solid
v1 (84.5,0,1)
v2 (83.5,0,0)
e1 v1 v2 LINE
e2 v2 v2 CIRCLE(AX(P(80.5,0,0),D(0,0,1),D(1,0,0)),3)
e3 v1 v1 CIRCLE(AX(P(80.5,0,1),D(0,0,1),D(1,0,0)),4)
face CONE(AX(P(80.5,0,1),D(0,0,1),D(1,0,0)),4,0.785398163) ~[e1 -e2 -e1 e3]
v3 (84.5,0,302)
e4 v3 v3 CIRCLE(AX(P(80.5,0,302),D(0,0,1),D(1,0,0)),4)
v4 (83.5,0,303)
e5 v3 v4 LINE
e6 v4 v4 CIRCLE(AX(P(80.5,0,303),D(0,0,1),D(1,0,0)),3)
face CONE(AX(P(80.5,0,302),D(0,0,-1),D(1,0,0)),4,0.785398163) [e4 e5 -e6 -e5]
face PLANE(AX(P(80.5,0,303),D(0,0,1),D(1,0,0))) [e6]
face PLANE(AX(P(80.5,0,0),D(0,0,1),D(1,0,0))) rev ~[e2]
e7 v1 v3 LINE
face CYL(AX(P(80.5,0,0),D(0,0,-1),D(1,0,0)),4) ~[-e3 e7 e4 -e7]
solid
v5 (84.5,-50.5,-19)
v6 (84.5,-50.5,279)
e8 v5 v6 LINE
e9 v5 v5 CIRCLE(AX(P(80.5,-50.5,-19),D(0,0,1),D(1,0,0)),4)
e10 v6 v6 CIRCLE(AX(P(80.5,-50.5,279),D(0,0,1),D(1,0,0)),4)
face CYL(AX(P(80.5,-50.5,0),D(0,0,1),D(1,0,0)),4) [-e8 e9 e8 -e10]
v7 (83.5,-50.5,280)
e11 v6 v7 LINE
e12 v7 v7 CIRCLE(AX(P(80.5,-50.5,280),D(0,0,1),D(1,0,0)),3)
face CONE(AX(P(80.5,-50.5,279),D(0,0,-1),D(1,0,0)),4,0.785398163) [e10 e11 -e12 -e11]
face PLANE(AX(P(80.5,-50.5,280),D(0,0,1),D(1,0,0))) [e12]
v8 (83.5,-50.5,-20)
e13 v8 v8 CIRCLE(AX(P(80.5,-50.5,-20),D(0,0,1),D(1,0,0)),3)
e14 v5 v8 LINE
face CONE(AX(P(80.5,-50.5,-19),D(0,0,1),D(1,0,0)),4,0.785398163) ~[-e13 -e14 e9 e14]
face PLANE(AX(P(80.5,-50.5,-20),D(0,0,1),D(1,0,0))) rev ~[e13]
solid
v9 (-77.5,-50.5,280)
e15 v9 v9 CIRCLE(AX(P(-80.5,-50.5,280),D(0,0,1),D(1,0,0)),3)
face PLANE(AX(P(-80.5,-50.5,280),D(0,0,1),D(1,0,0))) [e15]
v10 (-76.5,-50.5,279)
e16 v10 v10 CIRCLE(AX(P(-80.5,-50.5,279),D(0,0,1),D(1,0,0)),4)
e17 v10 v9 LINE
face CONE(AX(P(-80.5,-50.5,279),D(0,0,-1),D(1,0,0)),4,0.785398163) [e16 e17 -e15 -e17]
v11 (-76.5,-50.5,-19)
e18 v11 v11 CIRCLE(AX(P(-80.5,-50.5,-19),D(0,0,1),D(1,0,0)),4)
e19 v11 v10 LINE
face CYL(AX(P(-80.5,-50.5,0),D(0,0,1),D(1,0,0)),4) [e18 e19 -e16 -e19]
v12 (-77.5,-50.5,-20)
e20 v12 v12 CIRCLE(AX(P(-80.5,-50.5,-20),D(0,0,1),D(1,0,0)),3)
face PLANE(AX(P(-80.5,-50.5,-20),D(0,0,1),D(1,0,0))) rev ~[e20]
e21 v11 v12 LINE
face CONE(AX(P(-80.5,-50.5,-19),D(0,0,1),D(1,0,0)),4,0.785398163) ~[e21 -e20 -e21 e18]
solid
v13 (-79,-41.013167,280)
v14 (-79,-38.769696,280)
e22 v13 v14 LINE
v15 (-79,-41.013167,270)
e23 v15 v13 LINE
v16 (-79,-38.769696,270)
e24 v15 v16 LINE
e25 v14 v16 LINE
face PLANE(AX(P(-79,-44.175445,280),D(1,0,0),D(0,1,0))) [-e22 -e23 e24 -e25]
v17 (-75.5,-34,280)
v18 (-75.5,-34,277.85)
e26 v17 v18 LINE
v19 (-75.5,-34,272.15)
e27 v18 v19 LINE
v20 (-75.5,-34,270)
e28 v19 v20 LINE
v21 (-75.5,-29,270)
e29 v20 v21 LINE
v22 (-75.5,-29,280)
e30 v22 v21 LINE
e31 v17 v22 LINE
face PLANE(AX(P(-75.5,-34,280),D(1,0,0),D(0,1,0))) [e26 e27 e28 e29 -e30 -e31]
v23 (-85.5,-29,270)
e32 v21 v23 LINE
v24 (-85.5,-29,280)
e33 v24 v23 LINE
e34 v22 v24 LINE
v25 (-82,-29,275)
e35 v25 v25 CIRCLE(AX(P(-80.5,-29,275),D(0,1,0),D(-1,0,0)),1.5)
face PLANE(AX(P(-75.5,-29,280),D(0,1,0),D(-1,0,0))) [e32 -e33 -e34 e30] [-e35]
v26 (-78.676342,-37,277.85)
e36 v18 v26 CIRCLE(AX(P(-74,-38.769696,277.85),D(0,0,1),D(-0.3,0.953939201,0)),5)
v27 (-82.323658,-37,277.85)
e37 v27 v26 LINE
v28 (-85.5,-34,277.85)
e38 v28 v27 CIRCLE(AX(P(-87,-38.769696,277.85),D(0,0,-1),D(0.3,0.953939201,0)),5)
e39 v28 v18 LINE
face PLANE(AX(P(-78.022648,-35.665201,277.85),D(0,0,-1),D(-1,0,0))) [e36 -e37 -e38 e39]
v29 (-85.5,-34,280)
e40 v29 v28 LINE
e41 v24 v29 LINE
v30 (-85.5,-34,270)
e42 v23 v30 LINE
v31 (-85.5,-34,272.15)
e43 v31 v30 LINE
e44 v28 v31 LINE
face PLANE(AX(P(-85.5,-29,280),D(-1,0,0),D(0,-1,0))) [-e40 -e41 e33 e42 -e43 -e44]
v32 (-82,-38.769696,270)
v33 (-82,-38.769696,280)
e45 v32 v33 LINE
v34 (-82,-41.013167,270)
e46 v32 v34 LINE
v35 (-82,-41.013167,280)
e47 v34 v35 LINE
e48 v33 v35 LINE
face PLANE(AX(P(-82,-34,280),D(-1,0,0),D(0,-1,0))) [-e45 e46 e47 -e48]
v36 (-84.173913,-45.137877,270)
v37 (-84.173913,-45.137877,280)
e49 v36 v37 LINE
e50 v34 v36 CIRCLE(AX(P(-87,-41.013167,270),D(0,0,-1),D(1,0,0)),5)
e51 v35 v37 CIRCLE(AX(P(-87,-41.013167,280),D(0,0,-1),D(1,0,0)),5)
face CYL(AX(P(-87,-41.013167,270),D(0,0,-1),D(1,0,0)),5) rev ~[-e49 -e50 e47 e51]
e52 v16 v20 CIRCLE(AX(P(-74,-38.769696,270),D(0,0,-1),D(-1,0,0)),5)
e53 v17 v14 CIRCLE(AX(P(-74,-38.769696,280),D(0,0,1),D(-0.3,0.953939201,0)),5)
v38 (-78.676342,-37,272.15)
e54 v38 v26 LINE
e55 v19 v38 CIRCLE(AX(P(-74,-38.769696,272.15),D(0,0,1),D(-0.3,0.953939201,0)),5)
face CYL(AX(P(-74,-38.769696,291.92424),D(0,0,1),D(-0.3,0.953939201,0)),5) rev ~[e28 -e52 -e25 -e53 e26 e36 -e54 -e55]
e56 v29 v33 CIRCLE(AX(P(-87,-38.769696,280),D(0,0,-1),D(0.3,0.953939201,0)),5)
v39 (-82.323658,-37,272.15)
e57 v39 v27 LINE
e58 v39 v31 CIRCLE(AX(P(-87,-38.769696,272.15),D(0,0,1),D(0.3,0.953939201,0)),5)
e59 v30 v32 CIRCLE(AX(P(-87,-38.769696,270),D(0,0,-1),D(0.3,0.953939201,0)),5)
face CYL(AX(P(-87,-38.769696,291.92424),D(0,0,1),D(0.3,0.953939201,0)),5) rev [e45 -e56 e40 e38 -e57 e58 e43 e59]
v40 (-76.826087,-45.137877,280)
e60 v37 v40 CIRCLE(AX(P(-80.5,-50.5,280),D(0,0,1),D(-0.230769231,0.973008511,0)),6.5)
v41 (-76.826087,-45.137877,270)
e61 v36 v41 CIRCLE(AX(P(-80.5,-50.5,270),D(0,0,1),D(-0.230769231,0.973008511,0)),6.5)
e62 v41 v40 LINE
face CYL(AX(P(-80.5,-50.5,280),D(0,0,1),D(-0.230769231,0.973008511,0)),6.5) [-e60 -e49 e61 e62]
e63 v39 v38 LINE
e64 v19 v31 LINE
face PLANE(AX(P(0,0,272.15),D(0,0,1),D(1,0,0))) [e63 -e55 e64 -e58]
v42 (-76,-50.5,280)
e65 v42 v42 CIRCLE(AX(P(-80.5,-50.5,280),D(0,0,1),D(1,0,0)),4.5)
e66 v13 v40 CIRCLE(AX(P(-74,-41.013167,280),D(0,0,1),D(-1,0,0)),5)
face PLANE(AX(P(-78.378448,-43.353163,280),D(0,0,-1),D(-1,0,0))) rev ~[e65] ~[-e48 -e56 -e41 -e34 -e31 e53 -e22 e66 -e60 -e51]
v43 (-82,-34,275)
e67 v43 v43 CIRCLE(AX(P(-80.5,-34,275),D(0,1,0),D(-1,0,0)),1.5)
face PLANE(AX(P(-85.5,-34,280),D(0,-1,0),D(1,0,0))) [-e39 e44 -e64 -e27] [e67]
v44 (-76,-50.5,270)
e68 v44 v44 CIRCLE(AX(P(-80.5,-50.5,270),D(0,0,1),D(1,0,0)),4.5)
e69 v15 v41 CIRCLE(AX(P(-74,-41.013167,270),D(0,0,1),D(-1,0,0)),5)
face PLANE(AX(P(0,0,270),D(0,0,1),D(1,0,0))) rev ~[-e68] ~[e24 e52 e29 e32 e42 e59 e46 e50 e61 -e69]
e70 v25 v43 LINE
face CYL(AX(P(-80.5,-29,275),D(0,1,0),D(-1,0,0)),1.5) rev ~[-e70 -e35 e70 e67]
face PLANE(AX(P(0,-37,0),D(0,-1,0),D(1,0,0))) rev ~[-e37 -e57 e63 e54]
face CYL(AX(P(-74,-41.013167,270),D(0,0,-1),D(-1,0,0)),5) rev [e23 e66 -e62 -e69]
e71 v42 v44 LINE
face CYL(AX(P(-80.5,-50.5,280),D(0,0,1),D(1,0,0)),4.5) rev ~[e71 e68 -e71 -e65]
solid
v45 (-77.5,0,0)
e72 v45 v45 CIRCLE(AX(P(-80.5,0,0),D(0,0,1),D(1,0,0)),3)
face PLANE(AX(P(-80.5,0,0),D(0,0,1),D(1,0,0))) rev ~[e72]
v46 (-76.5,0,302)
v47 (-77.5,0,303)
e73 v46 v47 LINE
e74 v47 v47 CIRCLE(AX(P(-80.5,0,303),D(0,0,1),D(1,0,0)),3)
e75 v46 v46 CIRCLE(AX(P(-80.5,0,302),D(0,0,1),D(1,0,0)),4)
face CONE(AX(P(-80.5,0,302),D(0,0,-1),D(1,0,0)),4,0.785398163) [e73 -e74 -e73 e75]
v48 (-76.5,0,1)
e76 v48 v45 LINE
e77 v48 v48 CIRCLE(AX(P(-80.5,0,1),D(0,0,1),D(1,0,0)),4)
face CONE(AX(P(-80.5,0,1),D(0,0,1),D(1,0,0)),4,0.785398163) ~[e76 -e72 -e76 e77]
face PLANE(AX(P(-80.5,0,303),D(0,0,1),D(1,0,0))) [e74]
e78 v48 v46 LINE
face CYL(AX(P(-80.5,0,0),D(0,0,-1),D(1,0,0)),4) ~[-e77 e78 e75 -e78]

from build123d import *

# Parameters (mm, degrees)
F0_R          = 4
F1_DEPTH      = 303
F2_SIZE       = 1
F2_2_SIZE     = 1
F3_R          = 4
F4_DEPTH      = 280
F4_DEPTH_BACK = 20
F5_SIZE       = 1
F5_2_SIZE     = 1
F6_R          = 4.5
F7_DEPTH      = 10
F9_W          = 3
F9_H          = 5.7
F10_DEPTH     = 3
F8_R          = 1.5
F11_DEPTH     = 7
F12_T1_DEPTH  = 2.15
F12_T3_DEPTH  = 10
F12_T8_DEPTH  = 25.9984800354
F12_T15_DEPTH = 25.9984800354
F12_T21_DEPTH = 25.9984800354
F12_T28_DEPTH = 25.9984800354


# Not quite as in the source:
# - a fillet or chamfer that OpenCascade refuses, or shapes differently, is made with other operations: its cross-section is extruded or revolved along the edge and cut away or added


with BuildPart() as f1:
    # F0 (on Top) → F1 (new body)
    with BuildSketch(Plane.XY):
        with Locations((-80.5, 0)):
            Circle(F0_R)
    extrude(amount=F1_DEPTH)

    # F2
    f2_edges = [f1.edges().sort_by_distance(p)[0] for p in [
        (-84.5, 0, 0),
        (-84.5, 0, 303),
    ]]
    chamfer(f2_edges, length=F2_SIZE)


with BuildPart() as f1b:
    # F0 (on Top) → F1, piece 2 (new body)
    with BuildSketch(Plane.XY):
        with Locations((80.5, 0)):
            Circle(F0_R)
    extrude(amount=F1_DEPTH)

    # F2#2
    f2_2_edges = [f1b.edges().sort_by_distance(p)[0] for p in [
        (76.5, 0, 0),
        (76.5, 0, 303),
    ]]
    chamfer(f2_2_edges, length=F2_2_SIZE)


with BuildPart() as f4:
    # F3 (on Top) → F4 (new body, two sides)
    with BuildSketch(Plane.XY) as f4_sk:
        with Locations((-80.5, -50.5)):
            Circle(F3_R)
    extrude(amount=F4_DEPTH)
    extrude(f4_sk.sketch, amount=-F4_DEPTH_BACK)

    # F5
    f5_edges = [f4.edges().sort_by_distance(p)[0] for p in [
        (-84.5, -50.5, 280),
        (-84.5, -50.5, -20),
    ]]
    chamfer(f5_edges, length=F5_SIZE)


with BuildPart() as f4b:
    # F3 (on Top) → F4, piece 2 (new body, two sides)
    with BuildSketch(Plane.XY) as f4_2_sk:
        with Locations((80.5, -50.5)):
            Circle(F3_R)
    extrude(amount=F4_DEPTH)
    extrude(f4_2_sk.sketch, amount=-F4_DEPTH_BACK)

    # F5#2
    f5_2_edges = [f4b.edges().sort_by_distance(p)[0] for p in [
        (76.5, -50.5, 280),
        (76.5, -50.5, -20),
    ]]
    chamfer(f5_2_edges, length=F5_2_SIZE)


with BuildPart() as f7:
    # F6 (on face) → F7 (new body)
    with BuildSketch(Plane.XY.offset(280)):
        with BuildLine():
            Line((-82, -34), (-82, -44.1754446797))
            ThreePointArc((-82, -44.1754446797), (-80.5, -57), (-79, -44.1754446797))
            Line((-79, -44.1754446797), (-79, -34))
            Line((-79, -34), (-75.5, -34))
            Line((-75.5, -34), (-75.5, -29))
            Line((-75.5, -29), (-85.5, -29))
            Line((-85.5, -29), (-85.5, -34))
            Line((-85.5, -34), (-82, -34))
        make_face()
        with Locations((-80.5, -50.5)):
            Circle(F6_R, mode=Mode.SUBTRACT)
    extrude(amount=-F7_DEPTH)

    # F9 (on face) → F10 (cut, through all)
    with BuildSketch(Plane.YZ.offset(-79)):
        with Locations((-35.5, 275)):
            Rectangle(F9_W, F9_H)
    extrude(amount=-F10_DEPTH, mode=Mode.SUBTRACT)

    # F8 (on face) → F11 (cut)
    with BuildSketch(Plane(origin=(0, -29, 0), x_dir=(-1, 0, 0), z_dir=(0, 1, 0))):
        with Locations((80.5, 275)):
            Circle(F8_R)
    extrude(amount=-F11_DEPTH, mode=Mode.SUBTRACT)

    # F12: fillet of radius 5 on 4 edges, made by hand

    # F12_s2 → F12_t1 (join)
    with BuildSketch(Plane.XY.offset(277.85)):
        with BuildLine():
            ThreePointArc((-75.5, -34), (-78.0311288741, -35.8116561155), (-79, -38.7696960071))
            Line((-79, -38.7696960071), (-79, -34))
            Line((-79, -34), (-75.5, -34))
        make_face()
        with BuildLine():
            ThreePointArc((-85.5, -34), (-82.9688711259, -35.8116561155), (-82, -38.7696960071))
            Line((-82, -38.7696960071), (-82, -34))
            Line((-82, -34), (-85.5, -34))
        make_face()
    extrude(amount=F12_T1_DEPTH)

    # F12_s4 → F12_t3 (join)
    with BuildSketch(Plane.XY.offset(270)):
        with BuildLine():
            ThreePointArc((-79, -41.0131670195), (-78.4232586846, -43.3444290401), (-76.8260869565, -45.137877011))
            ThreePointArc((-76.8260869565, -45.137877011), (-77.8686670596, -44.5564247328), (-79, -44.1754446797))
            Line((-79, -44.1754446797), (-79, -41.0131670195))
        make_face()
        with BuildLine():
            ThreePointArc((-82, -41.0131670195), (-82.5767413154, -43.3444290401), (-84.1739130435, -45.137877011))
            ThreePointArc((-84.1739130435, -45.137877011), (-83.1313329404, -44.5564247328), (-82, -44.1754446797))
            Line((-82, -44.1754446797), (-82, -41.0131670195))
        make_face()
    extrude(amount=F12_T3_DEPTH)


with BuildPart() as f12_tool6:
    # F12_s7 → F12_t8 (new body)
    with BuildSketch(Plane.XY.offset(291.9242400177)):
        with BuildLine():
            ThreePointArc((-75.5, -34), (-78.0311288741, -35.8116561155), (-79, -38.7696960071))
            Line((-79, -38.7696960071), (-79, -34))
            Line((-79, -34), (-75.5, -34))
        make_face()
    extrude(amount=-F12_T8_DEPTH)

    split(bisect_by=Plane.XY.offset(270), keep=Keep.TOP)

    split(bisect_by=Plane.XY.offset(277.85), keep=Keep.BOTTOM)

    split(bisect_by=Plane.XZ.offset(37), keep=Keep.TOP)


with BuildPart() as f7_1:
    add(f7.part)

    # F12_t5: union F12_tool6
    add(f12_tool6.part)


with BuildPart() as f12_tool13:
    # F12_s14 → F12_t15 (new body)
    with BuildSketch(Plane.XY.offset(291.9242400177)):
        with BuildLine():
            ThreePointArc((-75.5, -34), (-78.0311288741, -35.8116561155), (-79, -38.7696960071))
            Line((-79, -38.7696960071), (-79, -34))
            Line((-79, -34), (-75.5, -34))
        make_face()
    extrude(amount=-F12_T15_DEPTH)

    split(bisect_by=Plane.XY.offset(270), keep=Keep.TOP)

    split(bisect_by=Plane.XY.offset(272.15), keep=Keep.BOTTOM)


with BuildPart() as f7_2:
    add(f7_1.part)

    # F12_t12: union F12_tool13
    add(f12_tool13.part)


with BuildPart() as f12_tool19:
    # F12_s20 → F12_t21 (new body)
    with BuildSketch(Plane.XY.offset(291.9242400177)):
        with BuildLine():
            ThreePointArc((-85.5, -34), (-82.9688711259, -35.8116561155), (-82, -38.7696960071))
            Line((-82, -38.7696960071), (-82, -34))
            Line((-82, -34), (-85.5, -34))
        make_face()
    extrude(amount=-F12_T21_DEPTH)

    split(bisect_by=Plane.XY.offset(270), keep=Keep.TOP)

    split(bisect_by=Plane.XY.offset(277.85), keep=Keep.BOTTOM)

    split(bisect_by=Plane.XZ.offset(37), keep=Keep.TOP)


with BuildPart() as f7_3:
    add(f7_2.part)

    # F12_t18: union F12_tool19
    add(f12_tool19.part)


with BuildPart() as f12_tool26:
    # F12_s27 → F12_t28 (new body)
    with BuildSketch(Plane.XY.offset(291.9242400177)):
        with BuildLine():
            ThreePointArc((-85.5, -34), (-82.9688711259, -35.8116561155), (-82, -38.7696960071))
            Line((-82, -38.7696960071), (-82, -34))
            Line((-82, -34), (-85.5, -34))
        make_face()
    extrude(amount=-F12_T28_DEPTH)

    split(bisect_by=Plane.XY.offset(270), keep=Keep.TOP)

    split(bisect_by=Plane.XY.offset(272.15), keep=Keep.BOTTOM)


with BuildPart() as f7_4:
    add(f7_3.part)

    # F12_t25: union F12_tool26
    add(f12_tool26.part)


solid = Compound([f1.part, f1b.part, f4.part, f4b.part, f7_4.part])
